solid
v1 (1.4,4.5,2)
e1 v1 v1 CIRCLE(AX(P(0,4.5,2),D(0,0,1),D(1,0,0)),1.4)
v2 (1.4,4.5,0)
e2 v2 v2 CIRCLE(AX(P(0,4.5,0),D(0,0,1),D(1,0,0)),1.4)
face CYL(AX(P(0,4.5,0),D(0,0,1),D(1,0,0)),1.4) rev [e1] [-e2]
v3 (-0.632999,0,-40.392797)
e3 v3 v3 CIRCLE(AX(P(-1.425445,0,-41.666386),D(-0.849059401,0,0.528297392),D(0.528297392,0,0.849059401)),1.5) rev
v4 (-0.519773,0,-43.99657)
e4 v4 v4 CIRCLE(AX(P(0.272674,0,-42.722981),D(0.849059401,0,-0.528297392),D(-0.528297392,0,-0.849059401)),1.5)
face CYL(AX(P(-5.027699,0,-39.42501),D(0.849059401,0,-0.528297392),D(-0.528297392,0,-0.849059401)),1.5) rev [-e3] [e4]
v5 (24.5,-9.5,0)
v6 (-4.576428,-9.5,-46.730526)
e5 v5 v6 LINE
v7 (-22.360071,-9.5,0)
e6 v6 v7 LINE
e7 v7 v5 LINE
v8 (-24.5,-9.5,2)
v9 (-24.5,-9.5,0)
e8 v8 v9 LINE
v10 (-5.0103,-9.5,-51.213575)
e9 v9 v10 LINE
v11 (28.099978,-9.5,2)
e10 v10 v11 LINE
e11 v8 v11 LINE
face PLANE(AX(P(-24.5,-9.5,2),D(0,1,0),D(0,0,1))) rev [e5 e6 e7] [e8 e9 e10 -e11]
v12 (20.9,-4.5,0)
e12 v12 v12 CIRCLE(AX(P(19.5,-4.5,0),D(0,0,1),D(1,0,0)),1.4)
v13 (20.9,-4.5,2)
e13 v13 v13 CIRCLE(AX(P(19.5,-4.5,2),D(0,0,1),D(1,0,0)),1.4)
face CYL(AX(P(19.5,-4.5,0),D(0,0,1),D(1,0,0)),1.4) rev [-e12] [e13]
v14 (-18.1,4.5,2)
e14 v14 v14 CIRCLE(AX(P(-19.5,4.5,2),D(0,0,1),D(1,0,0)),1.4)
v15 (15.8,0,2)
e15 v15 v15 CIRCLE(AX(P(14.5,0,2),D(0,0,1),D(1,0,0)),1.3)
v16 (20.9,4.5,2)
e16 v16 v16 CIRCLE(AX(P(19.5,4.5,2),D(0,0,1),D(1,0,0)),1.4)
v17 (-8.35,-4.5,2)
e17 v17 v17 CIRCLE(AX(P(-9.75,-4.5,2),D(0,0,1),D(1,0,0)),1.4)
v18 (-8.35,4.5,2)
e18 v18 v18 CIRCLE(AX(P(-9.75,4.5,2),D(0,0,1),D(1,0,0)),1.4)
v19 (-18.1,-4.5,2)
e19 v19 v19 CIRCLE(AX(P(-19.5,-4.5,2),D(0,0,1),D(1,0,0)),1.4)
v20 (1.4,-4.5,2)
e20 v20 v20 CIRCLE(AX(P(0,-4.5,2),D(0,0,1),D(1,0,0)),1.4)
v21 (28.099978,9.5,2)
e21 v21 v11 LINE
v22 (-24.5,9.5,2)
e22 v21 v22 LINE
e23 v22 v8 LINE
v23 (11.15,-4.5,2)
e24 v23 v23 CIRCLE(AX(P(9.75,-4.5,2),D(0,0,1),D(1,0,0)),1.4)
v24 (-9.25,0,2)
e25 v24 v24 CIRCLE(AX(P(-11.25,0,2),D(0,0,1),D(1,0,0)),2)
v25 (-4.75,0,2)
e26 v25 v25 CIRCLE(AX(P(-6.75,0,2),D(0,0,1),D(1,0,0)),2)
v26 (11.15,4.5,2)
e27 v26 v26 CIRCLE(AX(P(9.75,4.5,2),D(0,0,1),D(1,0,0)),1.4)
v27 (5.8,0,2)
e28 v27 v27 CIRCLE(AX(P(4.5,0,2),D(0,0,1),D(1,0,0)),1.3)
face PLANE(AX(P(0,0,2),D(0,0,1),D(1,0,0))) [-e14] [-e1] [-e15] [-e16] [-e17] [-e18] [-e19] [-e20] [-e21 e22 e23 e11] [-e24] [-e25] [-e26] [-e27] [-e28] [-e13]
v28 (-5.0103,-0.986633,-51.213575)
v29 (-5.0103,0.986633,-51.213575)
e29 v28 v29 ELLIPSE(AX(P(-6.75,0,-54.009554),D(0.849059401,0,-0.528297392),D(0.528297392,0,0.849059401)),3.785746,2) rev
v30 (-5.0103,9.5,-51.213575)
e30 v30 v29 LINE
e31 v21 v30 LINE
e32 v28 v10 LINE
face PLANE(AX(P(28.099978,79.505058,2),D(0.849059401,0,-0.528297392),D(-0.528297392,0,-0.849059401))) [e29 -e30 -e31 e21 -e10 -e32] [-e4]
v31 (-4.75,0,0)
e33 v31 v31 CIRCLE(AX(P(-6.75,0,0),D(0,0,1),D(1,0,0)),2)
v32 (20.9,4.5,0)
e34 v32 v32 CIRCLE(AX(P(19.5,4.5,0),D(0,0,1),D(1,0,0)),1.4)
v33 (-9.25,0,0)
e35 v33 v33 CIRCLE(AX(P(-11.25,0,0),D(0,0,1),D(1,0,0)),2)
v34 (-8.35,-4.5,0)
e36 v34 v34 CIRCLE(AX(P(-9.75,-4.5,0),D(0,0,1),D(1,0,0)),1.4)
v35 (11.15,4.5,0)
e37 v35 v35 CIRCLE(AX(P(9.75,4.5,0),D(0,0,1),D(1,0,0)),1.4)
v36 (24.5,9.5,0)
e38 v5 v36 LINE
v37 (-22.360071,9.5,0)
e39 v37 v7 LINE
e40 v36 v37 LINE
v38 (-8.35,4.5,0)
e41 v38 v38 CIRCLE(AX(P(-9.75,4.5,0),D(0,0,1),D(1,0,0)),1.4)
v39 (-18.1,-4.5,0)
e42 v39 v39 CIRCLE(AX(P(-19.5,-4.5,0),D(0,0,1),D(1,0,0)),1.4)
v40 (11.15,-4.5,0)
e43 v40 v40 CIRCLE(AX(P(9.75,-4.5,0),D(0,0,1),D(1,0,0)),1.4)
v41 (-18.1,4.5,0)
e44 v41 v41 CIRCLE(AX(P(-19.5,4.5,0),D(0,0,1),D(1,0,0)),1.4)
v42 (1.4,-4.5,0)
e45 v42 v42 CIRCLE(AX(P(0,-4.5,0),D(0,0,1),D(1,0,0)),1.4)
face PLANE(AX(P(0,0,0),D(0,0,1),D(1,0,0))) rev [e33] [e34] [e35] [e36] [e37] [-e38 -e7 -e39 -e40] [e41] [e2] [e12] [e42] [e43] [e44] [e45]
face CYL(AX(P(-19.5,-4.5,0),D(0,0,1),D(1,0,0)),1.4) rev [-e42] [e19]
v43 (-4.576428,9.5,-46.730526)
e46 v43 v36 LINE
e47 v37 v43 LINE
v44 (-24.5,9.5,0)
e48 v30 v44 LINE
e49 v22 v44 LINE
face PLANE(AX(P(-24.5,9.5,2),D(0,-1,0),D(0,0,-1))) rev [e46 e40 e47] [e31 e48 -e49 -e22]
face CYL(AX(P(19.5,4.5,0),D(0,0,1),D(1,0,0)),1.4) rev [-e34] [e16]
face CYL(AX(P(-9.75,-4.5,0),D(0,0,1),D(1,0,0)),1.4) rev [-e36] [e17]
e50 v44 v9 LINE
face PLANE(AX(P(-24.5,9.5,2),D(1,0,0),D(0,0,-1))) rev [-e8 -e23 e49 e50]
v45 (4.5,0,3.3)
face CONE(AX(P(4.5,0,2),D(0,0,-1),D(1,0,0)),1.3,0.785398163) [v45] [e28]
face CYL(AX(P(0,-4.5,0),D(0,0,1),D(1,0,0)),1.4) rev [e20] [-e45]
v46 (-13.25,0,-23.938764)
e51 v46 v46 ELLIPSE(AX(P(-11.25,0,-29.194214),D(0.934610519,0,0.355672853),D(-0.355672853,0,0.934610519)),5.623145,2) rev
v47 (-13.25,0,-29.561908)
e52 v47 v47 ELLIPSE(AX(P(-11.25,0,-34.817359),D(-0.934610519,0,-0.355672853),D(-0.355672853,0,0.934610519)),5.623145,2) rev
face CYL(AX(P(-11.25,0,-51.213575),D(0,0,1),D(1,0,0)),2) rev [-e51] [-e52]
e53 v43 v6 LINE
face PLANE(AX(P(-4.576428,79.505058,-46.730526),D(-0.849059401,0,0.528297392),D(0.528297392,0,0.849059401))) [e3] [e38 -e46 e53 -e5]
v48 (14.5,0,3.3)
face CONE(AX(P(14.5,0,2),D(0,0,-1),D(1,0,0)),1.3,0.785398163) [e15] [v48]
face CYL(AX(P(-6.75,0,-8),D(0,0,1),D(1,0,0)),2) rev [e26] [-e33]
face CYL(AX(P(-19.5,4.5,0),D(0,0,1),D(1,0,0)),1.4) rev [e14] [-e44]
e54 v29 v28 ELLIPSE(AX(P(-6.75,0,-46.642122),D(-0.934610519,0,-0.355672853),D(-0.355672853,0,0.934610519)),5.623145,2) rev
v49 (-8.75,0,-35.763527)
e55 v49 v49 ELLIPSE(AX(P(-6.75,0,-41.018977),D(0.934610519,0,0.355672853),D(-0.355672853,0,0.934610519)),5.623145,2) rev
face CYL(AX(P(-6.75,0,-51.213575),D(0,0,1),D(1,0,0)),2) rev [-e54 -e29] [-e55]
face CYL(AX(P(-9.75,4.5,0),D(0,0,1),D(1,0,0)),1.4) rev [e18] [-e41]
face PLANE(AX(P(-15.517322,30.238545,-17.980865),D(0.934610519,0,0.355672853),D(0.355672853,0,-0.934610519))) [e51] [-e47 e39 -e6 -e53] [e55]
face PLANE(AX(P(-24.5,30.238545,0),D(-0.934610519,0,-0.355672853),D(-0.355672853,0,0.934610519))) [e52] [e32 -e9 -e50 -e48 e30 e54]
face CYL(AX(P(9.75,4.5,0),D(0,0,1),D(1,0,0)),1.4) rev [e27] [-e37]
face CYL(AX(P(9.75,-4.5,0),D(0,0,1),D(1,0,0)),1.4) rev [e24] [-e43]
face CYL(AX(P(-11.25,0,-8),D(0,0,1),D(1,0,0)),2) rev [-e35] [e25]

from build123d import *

# Parameters (mm, degrees)
SKETCH1_W           = 49
SKETCH1_H           = 19
BOSS_EXTRUDE1_DEPTH = 2
SKETCH3_R           = 1.4
CUT_EXTRUDE1_DEPTH  = 27.353367906
SKETCH5_R           = 2
CUT_EXTRUDE2_DEPTH  = 10
SKETCH2_R           = 1.3
BOSS_EXTRUDE2_DEPTH = 2.5
BOSS_EXTRUDE3_DEPTH = 19
BOSS_EXTRUDE4_DEPTH = 19
SKETCH7_R           = 2
CUT_EXTRUDE3_DEPTH  = 60.183519481
SKETCH8_R           = 1.5
CUT_EXTRUDE4_DEPTH  = 2


# Read off the part's stored shape, not the designer's step: Draft1
with BuildPart() as part:
    # Sketch1 → Boss-Extrude1 (new body)
    with BuildSketch(Plane.XY):
        Rectangle(SKETCH1_W, SKETCH1_H)
    extrude(amount=BOSS_EXTRUDE1_DEPTH)

    # Sketch3 → Cut-Extrude1 (cut, through all)
    with BuildSketch(Plane.XY.offset(2)):
        with Locations((19.5, 4.5)):
            Circle(SKETCH3_R)
        with Locations((9.75, 4.5)):
            Circle(SKETCH3_R)
        with Locations((0, 4.5)):
            Circle(SKETCH3_R)
        with Locations((-9.75, 4.5)):
            Circle(SKETCH3_R)
        with Locations((-19.5, 4.5)):
            Circle(SKETCH3_R)
        with Locations((-19.5, -4.5)):
            Circle(SKETCH3_R)
        with Locations((-9.75, -4.5)):
            Circle(SKETCH3_R)
        with Locations((0, -4.5)):
            Circle(SKETCH3_R)
        with Locations((9.75, -4.5)):
            Circle(SKETCH3_R)
        with Locations((19.5, -4.5)):
            Circle(SKETCH3_R)
    extrude(amount=-CUT_EXTRUDE1_DEPTH, mode=Mode.SUBTRACT)

    # Sketch5 → Cut-Extrude2 (cut)
    with BuildSketch(Plane.XY.offset(2)):
        with Locations((-6.75, 0)):
            Circle(SKETCH5_R)
        with Locations((-11.25, 0)):
            Circle(SKETCH5_R)
    extrude(amount=-CUT_EXTRUDE2_DEPTH, mode=Mode.SUBTRACT)

    # Sketch2 → Boss-Extrude2 (add)
    with BuildSketch(Plane.XY.offset(2)):
        with Locations((4.5, 0)):
            Circle(SKETCH2_R)
        with Locations((14.5, 0)):
            Circle(SKETCH2_R)
    extrude(amount=BOSS_EXTRUDE2_DEPTH)

    # Draft1 outline → Draft1 (revolve, cut)
    with BuildSketch(Plane(origin=(4.5, 0, 0), x_dir=(1, 0, 0), z_dir=(0, -1, 0))):
        Polygon((1.3, 2), (1.3, 4.5), (0, 4.5), (0, 3.3), align=None)
    revolve(axis=Axis((4.5, 0, 0), (0, 0, 1)), mode=Mode.SUBTRACT)

    # Draft1 2 outline → Draft1 2 (revolve, cut)
    with BuildSketch(Plane(origin=(14.5, 0, 0), x_dir=(1, 0, 0), z_dir=(0, -1, 0))):
        Polygon((1.3, 2), (1.3, 4.5), (0, 4.5), (0, 3.3), align=None)
    revolve(axis=Axis((14.5, 0, 0), (0, 0, 1)), mode=Mode.SUBTRACT)

    # Sketch4 → Boss-Extrude3 (add)
    with BuildSketch(Plane.XZ.offset(9.5)):
        Polygon((-24.5, 0), (-17.386542933, -18.692210371), (-15.517321896, -17.980864664), (-22.360071163, 0), align=None)
    extrude(amount=-BOSS_EXTRUDE3_DEPTH)

    # Sketch6 → Boss-Extrude4 (add)
    with BuildSketch(Plane.XZ.offset(9.5)):
        Polygon((-15.517321896, -17.980864664), (-4.576428495, -46.730525927), (24.5, 0), (24.5, 2), (28.099977552, 2), (-5.010300383, -51.213574761), (-17.386542933, -18.692210371), align=None)
    extrude(amount=-BOSS_EXTRUDE4_DEPTH)

    # Sketch7 → Cut-Extrude3 (cut, through all)
    with BuildSketch(Plane(origin=(0, 0, 0), x_dir=(-1, 0, 0), z_dir=(0, 0, -1))):
        with Locations(Location((11.25, 0, 0), (0, 0, 180))):
            Circle(SKETCH7_R)
        with Locations(Location((6.75, 0, 0), (0, 0, 180))):
            Circle(SKETCH7_R)
    extrude(amount=CUT_EXTRUDE3_DEPTH, mode=Mode.SUBTRACT)

    # Sketch8 → Cut-Extrude4 (cut)
    with BuildSketch(Plane(origin=(19.36021452, 0, -12.046213518), x_dir=(-0.5282973915815173, 0, -0.849059400777216), z_dir=(0.8490594007772159, 0, -0.5282973915815172))):
        with Locations((36.130295721, 0)):
            Circle(SKETCH8_R)
    extrude(amount=-CUT_EXTRUDE4_DEPTH, mode=Mode.SUBTRACT)


solid = part.part
